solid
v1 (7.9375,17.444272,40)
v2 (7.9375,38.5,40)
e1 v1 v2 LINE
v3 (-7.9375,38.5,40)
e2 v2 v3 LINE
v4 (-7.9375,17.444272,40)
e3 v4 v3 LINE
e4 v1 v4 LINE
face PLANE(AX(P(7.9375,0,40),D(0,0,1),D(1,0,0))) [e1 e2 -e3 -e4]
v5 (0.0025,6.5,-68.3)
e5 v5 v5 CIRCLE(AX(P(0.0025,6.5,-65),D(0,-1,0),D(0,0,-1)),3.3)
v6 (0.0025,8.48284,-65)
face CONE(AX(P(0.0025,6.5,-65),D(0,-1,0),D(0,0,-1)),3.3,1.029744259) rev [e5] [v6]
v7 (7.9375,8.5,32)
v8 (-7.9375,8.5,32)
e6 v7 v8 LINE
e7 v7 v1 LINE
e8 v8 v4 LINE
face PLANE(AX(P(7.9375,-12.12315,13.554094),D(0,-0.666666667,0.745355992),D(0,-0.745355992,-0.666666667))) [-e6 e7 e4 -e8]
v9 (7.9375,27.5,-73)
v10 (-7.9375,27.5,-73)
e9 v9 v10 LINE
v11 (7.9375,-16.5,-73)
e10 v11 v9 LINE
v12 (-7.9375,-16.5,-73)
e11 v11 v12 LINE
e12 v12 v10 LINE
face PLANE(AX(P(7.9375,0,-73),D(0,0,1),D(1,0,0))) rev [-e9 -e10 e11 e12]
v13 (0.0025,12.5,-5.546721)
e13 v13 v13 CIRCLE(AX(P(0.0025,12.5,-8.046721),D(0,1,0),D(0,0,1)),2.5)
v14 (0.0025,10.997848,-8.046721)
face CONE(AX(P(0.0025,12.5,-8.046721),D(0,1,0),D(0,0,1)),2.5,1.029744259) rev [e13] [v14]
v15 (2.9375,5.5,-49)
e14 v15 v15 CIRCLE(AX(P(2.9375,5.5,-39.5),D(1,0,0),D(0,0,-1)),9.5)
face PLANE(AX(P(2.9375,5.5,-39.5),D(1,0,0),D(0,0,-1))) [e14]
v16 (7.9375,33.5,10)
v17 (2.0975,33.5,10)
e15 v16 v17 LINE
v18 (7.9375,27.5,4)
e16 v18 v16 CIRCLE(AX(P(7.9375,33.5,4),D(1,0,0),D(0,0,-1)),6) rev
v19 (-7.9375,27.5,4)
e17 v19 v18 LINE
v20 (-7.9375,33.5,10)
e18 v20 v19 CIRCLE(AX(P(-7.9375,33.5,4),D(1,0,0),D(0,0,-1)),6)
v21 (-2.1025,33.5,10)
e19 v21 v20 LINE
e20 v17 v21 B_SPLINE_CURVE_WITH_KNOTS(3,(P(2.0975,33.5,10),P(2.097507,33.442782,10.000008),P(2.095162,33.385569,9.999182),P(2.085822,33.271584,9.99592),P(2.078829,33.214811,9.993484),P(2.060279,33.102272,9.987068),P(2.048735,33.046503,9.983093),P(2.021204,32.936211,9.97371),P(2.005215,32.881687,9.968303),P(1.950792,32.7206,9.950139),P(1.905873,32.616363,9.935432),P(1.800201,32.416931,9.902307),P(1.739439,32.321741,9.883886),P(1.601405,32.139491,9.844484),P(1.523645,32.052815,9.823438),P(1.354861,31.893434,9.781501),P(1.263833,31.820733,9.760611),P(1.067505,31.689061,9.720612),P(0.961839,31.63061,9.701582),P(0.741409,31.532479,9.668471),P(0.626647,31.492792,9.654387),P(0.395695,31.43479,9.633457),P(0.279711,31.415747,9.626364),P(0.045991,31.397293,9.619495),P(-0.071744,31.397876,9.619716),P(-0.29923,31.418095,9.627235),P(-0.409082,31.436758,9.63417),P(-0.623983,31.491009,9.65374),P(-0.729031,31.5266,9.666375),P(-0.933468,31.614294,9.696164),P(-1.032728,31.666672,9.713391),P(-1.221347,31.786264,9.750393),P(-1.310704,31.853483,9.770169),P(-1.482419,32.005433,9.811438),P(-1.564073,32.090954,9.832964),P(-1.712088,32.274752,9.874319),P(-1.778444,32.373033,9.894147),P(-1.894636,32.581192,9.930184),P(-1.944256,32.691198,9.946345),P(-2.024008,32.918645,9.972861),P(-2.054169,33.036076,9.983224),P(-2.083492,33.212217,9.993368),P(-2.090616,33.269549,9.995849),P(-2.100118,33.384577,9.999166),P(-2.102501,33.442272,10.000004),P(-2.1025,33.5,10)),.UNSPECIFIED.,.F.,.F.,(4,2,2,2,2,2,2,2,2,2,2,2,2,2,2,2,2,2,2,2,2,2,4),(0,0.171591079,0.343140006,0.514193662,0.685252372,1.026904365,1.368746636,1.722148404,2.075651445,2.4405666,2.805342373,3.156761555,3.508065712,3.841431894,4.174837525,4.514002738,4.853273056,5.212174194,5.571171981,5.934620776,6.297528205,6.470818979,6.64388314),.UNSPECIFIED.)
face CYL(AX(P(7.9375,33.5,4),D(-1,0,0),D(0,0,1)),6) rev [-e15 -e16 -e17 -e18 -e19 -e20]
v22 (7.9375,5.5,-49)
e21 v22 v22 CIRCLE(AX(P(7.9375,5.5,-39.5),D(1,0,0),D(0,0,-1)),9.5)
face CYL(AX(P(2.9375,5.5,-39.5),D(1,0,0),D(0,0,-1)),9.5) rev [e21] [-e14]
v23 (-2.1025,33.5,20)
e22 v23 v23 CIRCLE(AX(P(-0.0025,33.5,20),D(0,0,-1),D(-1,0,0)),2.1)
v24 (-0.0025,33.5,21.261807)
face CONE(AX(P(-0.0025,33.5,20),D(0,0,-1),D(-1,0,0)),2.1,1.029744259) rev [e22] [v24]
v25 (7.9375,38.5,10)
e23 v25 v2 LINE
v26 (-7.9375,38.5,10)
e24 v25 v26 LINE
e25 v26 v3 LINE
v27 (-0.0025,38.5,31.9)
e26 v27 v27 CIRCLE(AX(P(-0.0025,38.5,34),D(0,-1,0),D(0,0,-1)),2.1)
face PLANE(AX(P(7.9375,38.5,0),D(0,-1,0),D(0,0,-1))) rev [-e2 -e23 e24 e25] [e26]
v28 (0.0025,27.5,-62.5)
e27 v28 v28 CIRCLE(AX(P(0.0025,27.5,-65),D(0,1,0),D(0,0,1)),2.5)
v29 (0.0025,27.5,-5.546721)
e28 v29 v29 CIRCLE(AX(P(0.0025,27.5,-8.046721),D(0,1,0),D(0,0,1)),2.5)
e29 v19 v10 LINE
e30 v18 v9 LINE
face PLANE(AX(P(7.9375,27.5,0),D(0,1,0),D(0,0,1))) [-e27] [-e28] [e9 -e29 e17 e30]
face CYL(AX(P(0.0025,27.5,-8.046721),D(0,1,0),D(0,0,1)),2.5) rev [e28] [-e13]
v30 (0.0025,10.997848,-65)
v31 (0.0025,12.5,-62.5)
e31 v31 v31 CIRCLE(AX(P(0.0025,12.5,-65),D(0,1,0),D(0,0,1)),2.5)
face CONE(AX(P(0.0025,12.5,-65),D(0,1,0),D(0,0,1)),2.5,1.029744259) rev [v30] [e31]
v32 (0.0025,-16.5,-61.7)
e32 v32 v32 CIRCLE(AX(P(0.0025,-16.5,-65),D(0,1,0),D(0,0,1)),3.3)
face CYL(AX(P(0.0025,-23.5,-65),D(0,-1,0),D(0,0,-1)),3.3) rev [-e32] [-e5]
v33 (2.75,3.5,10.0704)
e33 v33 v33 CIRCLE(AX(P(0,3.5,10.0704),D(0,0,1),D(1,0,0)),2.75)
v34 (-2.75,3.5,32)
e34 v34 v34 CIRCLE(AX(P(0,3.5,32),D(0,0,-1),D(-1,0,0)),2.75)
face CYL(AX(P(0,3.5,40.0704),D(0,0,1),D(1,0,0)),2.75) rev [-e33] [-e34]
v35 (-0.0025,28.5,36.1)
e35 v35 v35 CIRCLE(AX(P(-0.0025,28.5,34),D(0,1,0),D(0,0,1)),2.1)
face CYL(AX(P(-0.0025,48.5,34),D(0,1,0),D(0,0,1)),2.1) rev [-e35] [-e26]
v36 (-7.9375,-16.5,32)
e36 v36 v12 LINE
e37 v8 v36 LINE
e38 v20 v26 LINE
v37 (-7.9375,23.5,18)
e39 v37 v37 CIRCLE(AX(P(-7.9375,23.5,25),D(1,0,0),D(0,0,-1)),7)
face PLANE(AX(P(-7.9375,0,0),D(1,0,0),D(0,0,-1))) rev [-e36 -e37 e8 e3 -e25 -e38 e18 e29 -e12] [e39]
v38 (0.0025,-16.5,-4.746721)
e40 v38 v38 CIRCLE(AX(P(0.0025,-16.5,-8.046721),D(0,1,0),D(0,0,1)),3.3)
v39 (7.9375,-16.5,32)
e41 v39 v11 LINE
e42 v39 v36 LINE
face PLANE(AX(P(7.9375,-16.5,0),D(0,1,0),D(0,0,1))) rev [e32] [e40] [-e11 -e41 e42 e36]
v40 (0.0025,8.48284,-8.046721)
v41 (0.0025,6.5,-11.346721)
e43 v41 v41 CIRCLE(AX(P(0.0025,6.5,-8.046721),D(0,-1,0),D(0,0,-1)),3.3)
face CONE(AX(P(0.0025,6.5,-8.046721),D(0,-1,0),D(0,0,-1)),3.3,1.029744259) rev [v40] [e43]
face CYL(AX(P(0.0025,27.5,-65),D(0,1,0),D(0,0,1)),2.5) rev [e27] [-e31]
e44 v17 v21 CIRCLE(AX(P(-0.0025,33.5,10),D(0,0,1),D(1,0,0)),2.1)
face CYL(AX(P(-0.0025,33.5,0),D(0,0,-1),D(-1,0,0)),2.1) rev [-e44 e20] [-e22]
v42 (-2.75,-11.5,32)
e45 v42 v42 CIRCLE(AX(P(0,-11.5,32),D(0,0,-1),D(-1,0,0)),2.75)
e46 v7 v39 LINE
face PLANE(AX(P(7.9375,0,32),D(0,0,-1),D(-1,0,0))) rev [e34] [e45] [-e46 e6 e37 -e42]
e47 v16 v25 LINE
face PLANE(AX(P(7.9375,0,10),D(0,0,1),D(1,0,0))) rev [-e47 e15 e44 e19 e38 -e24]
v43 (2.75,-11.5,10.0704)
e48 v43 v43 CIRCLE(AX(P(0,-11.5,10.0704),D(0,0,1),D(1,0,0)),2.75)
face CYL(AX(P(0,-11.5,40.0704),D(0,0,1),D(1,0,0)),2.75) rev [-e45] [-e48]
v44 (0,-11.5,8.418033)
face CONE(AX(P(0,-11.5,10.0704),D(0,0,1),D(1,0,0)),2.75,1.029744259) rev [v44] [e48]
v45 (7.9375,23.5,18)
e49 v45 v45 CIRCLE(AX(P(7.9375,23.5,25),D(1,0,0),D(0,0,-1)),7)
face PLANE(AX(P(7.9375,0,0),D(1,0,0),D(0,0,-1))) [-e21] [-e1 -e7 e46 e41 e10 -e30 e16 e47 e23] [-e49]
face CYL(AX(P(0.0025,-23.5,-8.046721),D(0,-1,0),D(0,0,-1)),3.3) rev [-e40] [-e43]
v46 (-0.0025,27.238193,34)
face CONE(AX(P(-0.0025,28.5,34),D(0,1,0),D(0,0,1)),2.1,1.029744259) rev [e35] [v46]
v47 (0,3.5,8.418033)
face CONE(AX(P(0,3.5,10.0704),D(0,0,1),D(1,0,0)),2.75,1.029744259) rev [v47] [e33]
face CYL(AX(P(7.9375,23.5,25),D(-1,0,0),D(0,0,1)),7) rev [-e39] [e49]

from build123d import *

# Parameters (mm, degrees)
ESBO_O1_R                                            = 7
RESSALTO_EXTRUS_O1_DEPTH                             = 7.9375
ESCAREADO_PARA_PARAFUSO_DE_M_QUINA_COM_C_D           = 5.5
ESCAREADO_PARA_PARAFUSO_DE_M_QUINA_COM_C_DEPTH       = 30
ESCAREADO_PARA_PARAFUSO_DE_M_QUINA_COM_C_CSINK_D     = 10.4
ESCAREADO_PARA_PARAFUSO_DE_M_QUINA_COM_C_CSINK_ANGLE = 90
ESCAREADO_PARA_PARAFUSO_DE_M_QUINA_COM_C_TIP         = 1.652366702
ESCAREADO_PARA_PARAFUSO_DE_M_QUINA_C_2_D             = 6.6
ESCAREADO_PARA_PARAFUSO_DE_M_QUINA_C_2_DEPTH         = 30
ESCAREADO_PARA_PARAFUSO_DE_M_QUINA_C_2_CSINK_D       = 12.6
ESCAREADO_PARA_PARAFUSO_DE_M_QUINA_C_2_CSINK_ANGLE   = 90
ESCAREADO_PARA_PARAFUSO_DE_M_QUINA_C_2_TIP           = 1.982840043
BROCA_DE_ROSQUEAR_PARA_TARRAXA_DE_M5X0_8_D           = 4.2
BROCA_DE_ROSQUEAR_PARA_TARRAXA_DE_M5X0_8_DEPTH       = 20
BROCA_DE_ROSQUEAR_PARA_TARRAXA_DE_M5X0_8_TIP         = 1.2618073
BROCA_DE_ROSQUEAR_PARA_TARRAXA_DE_M5_2_D             = 4.2
BROCA_DE_ROSQUEAR_PARA_TARRAXA_DE_M5_2_DEPTH         = 20
BROCA_DE_ROSQUEAR_PARA_TARRAXA_DE_M5_2_TIP           = 1.2618073
BROCA_DE_ROSQUEAR_PARA_TARRAXA_DE_M6X1_0_D           = 5
BROCA_DE_ROSQUEAR_PARA_TARRAXA_DE_M6X1_0_DEPTH       = 15
BROCA_DE_ROSQUEAR_PARA_TARRAXA_DE_M6X1_0_TIP         = 1.502151548
FILLET1_R                                            = 6
SKETCH7_R                                            = 9.5
CUT_EXTRUDE4_DEPTH                                   = 5


with BuildPart() as part:
    # Esboço1 → Ressalto-extrusão1 (new, symmetric)
    with BuildSketch(Plane(origin=(0, 0, 0), x_dir=(0, 0, -1), z_dir=(1, 0, 0))):
        Polygon((-10, 38.5), (-40, 38.5), (-40, 23.5), (-40, 17.44427191), (-32, 8.5), (-32, -16.5), (73, -16.5), (73, 27.5), (-10, 27.5), align=None)
        with Locations((-25, 23.5)):
            Circle(ESBO_O1_R, mode=Mode.SUBTRACT)
    extrude(amount=RESSALTO_EXTRUS_O1_DEPTH, both=True)

    # Escareado para parafuso de m_quina com c
    with Locations(Plane(origin=(33.0625, -10.251665499, 40.070399895), x_dir=(1, 0, 0), z_dir=(0, 0, 1))):
        with Locations((-33.0625, 13.751665499), (-33.0625, -1.248334501), (33.0625, -1.248334501), (33.0625, 13.751665499)):
            CounterSinkHole(ESCAREADO_PARA_PARAFUSO_DE_M_QUINA_COM_C_D / 2, ESCAREADO_PARA_PARAFUSO_DE_M_QUINA_COM_C_CSINK_D / 2, depth=ESCAREADO_PARA_PARAFUSO_DE_M_QUINA_COM_C_DEPTH, counter_sink_angle=ESCAREADO_PARA_PARAFUSO_DE_M_QUINA_COM_C_CSINK_ANGLE)
            with Locations((0, 0, -(ESCAREADO_PARA_PARAFUSO_DE_M_QUINA_COM_C_DEPTH + ESCAREADO_PARA_PARAFUSO_DE_M_QUINA_COM_C_TIP / 2))):  # 118° drill point
                Cone(0, ESCAREADO_PARA_PARAFUSO_DE_M_QUINA_COM_C_D / 2, ESCAREADO_PARA_PARAFUSO_DE_M_QUINA_COM_C_TIP, mode=Mode.SUBTRACT)

    # Escareado para parafuso de m_quina c 2
    with Locations(Plane(origin=(33.0625, -23.5, -11.460196829), x_dir=(-1, 0, 0), z_dir=(0, -1, 0))):
        with Locations((33.06, 53.539803171), (33.06, -3.413475694), (-33.06, -3.413475694), (-33.06, 49.586524306)):
            CounterSinkHole(ESCAREADO_PARA_PARAFUSO_DE_M_QUINA_C_2_D / 2, ESCAREADO_PARA_PARAFUSO_DE_M_QUINA_C_2_CSINK_D / 2, depth=ESCAREADO_PARA_PARAFUSO_DE_M_QUINA_C_2_DEPTH, counter_sink_angle=ESCAREADO_PARA_PARAFUSO_DE_M_QUINA_C_2_CSINK_ANGLE)
            with Locations((0, 0, -(ESCAREADO_PARA_PARAFUSO_DE_M_QUINA_C_2_DEPTH + ESCAREADO_PARA_PARAFUSO_DE_M_QUINA_C_2_TIP / 2))):  # 118° drill point
                Cone(0, ESCAREADO_PARA_PARAFUSO_DE_M_QUINA_C_2_D / 2, ESCAREADO_PARA_PARAFUSO_DE_M_QUINA_C_2_TIP, mode=Mode.SUBTRACT)

    # Broca de rosquear para tarraxa de M5x0.8
    with Locations(Plane(origin=(33.0625, 48.5, -11.460196829), x_dir=(1, 0, 0), z_dir=(0, 1, 0))):
        with Locations((33.06, -45.460196829), (-33.065, -45.460196829)):
            Hole(BROCA_DE_ROSQUEAR_PARA_TARRAXA_DE_M5X0_8_D / 2, depth=BROCA_DE_ROSQUEAR_PARA_TARRAXA_DE_M5X0_8_DEPTH)
            with Locations((0, 0, -(BROCA_DE_ROSQUEAR_PARA_TARRAXA_DE_M5X0_8_DEPTH + BROCA_DE_ROSQUEAR_PARA_TARRAXA_DE_M5X0_8_TIP / 2))):  # 118° drill point
                Cone(0, BROCA_DE_ROSQUEAR_PARA_TARRAXA_DE_M5X0_8_D / 2, BROCA_DE_ROSQUEAR_PARA_TARRAXA_DE_M5X0_8_TIP, mode=Mode.SUBTRACT)

    # Broca de rosquear para tarraxa de M5 2
    with Locations(Plane(origin=(33.0625, -10.251665499, 0), x_dir=(-1, 0, 0), z_dir=(0, 0, -1))):
        with Locations((-33.06, 43.751665499), (33.065, 43.751665499)):
            Hole(BROCA_DE_ROSQUEAR_PARA_TARRAXA_DE_M5_2_D / 2, depth=BROCA_DE_ROSQUEAR_PARA_TARRAXA_DE_M5_2_DEPTH)
            with Locations((0, 0, -(BROCA_DE_ROSQUEAR_PARA_TARRAXA_DE_M5_2_DEPTH + BROCA_DE_ROSQUEAR_PARA_TARRAXA_DE_M5_2_TIP / 2))):  # 118° drill point
                Cone(0, BROCA_DE_ROSQUEAR_PARA_TARRAXA_DE_M5_2_D / 2, BROCA_DE_ROSQUEAR_PARA_TARRAXA_DE_M5_2_TIP, mode=Mode.SUBTRACT)

    # Broca de rosquear para tarraxa de M6x1.01
    with Locations(Plane(origin=(33.0625, 27.5, -11.460196829), x_dir=(1, 0, 0), z_dir=(0, 1, 0))):
        with Locations((33.06, 49.539803171), (-33.06, 53.539803171), (-33.06, -3.413475694), (33.06, -3.413475694)):
            Hole(BROCA_DE_ROSQUEAR_PARA_TARRAXA_DE_M6X1_0_D / 2, depth=BROCA_DE_ROSQUEAR_PARA_TARRAXA_DE_M6X1_0_DEPTH)
            with Locations((0, 0, -(BROCA_DE_ROSQUEAR_PARA_TARRAXA_DE_M6X1_0_DEPTH + BROCA_DE_ROSQUEAR_PARA_TARRAXA_DE_M6X1_0_TIP / 2))):  # 118° drill point
                Cone(0, BROCA_DE_ROSQUEAR_PARA_TARRAXA_DE_M6X1_0_D / 2, BROCA_DE_ROSQUEAR_PARA_TARRAXA_DE_M6X1_0_TIP, mode=Mode.SUBTRACT)

    # Fillet1
    # the kernel refuses this fillet: 6 mm, written as the material it adds along each edge
    with BuildSketch(Plane(origin=(7.9375, 27.5, 10), x_dir=(0, 1, 0), z_dir=(-1, 0, 0))) as fillet1_piece_1_section:
        with BuildLine():
            CenterArc((FILLET1_R, FILLET1_R), FILLET1_R, 180, 90)
            Line((0, FILLET1_R), (0, 0))
            Line((0, 0), (FILLET1_R, 0))
        make_face()
    fillet1_piece_1 = extrude(amount=15.875, mode=Mode.PRIVATE)
    fillet1_piece_1 = fillet1_piece_1 - Plane(origin=(-0.0025, 33.5, 8.627789353), x_dir=(1, 0, 0), z_dir=(0, 0, 1)) * Cylinder(2.1, 56, mode=Mode.PRIVATE)
    add(fillet1_piece_1)

    # Sketch7 → Cut-Extrude4 (cut)
    with BuildSketch(Plane(origin=(7.9375, 0, 0), x_dir=(0, 0, -1), z_dir=(1, 0, 0))):
        with Locations((39.5, 5.5)):
            Circle(SKETCH7_R)
    extrude(amount=-CUT_EXTRUDE4_DEPTH, mode=Mode.SUBTRACT)


solid = part.part
